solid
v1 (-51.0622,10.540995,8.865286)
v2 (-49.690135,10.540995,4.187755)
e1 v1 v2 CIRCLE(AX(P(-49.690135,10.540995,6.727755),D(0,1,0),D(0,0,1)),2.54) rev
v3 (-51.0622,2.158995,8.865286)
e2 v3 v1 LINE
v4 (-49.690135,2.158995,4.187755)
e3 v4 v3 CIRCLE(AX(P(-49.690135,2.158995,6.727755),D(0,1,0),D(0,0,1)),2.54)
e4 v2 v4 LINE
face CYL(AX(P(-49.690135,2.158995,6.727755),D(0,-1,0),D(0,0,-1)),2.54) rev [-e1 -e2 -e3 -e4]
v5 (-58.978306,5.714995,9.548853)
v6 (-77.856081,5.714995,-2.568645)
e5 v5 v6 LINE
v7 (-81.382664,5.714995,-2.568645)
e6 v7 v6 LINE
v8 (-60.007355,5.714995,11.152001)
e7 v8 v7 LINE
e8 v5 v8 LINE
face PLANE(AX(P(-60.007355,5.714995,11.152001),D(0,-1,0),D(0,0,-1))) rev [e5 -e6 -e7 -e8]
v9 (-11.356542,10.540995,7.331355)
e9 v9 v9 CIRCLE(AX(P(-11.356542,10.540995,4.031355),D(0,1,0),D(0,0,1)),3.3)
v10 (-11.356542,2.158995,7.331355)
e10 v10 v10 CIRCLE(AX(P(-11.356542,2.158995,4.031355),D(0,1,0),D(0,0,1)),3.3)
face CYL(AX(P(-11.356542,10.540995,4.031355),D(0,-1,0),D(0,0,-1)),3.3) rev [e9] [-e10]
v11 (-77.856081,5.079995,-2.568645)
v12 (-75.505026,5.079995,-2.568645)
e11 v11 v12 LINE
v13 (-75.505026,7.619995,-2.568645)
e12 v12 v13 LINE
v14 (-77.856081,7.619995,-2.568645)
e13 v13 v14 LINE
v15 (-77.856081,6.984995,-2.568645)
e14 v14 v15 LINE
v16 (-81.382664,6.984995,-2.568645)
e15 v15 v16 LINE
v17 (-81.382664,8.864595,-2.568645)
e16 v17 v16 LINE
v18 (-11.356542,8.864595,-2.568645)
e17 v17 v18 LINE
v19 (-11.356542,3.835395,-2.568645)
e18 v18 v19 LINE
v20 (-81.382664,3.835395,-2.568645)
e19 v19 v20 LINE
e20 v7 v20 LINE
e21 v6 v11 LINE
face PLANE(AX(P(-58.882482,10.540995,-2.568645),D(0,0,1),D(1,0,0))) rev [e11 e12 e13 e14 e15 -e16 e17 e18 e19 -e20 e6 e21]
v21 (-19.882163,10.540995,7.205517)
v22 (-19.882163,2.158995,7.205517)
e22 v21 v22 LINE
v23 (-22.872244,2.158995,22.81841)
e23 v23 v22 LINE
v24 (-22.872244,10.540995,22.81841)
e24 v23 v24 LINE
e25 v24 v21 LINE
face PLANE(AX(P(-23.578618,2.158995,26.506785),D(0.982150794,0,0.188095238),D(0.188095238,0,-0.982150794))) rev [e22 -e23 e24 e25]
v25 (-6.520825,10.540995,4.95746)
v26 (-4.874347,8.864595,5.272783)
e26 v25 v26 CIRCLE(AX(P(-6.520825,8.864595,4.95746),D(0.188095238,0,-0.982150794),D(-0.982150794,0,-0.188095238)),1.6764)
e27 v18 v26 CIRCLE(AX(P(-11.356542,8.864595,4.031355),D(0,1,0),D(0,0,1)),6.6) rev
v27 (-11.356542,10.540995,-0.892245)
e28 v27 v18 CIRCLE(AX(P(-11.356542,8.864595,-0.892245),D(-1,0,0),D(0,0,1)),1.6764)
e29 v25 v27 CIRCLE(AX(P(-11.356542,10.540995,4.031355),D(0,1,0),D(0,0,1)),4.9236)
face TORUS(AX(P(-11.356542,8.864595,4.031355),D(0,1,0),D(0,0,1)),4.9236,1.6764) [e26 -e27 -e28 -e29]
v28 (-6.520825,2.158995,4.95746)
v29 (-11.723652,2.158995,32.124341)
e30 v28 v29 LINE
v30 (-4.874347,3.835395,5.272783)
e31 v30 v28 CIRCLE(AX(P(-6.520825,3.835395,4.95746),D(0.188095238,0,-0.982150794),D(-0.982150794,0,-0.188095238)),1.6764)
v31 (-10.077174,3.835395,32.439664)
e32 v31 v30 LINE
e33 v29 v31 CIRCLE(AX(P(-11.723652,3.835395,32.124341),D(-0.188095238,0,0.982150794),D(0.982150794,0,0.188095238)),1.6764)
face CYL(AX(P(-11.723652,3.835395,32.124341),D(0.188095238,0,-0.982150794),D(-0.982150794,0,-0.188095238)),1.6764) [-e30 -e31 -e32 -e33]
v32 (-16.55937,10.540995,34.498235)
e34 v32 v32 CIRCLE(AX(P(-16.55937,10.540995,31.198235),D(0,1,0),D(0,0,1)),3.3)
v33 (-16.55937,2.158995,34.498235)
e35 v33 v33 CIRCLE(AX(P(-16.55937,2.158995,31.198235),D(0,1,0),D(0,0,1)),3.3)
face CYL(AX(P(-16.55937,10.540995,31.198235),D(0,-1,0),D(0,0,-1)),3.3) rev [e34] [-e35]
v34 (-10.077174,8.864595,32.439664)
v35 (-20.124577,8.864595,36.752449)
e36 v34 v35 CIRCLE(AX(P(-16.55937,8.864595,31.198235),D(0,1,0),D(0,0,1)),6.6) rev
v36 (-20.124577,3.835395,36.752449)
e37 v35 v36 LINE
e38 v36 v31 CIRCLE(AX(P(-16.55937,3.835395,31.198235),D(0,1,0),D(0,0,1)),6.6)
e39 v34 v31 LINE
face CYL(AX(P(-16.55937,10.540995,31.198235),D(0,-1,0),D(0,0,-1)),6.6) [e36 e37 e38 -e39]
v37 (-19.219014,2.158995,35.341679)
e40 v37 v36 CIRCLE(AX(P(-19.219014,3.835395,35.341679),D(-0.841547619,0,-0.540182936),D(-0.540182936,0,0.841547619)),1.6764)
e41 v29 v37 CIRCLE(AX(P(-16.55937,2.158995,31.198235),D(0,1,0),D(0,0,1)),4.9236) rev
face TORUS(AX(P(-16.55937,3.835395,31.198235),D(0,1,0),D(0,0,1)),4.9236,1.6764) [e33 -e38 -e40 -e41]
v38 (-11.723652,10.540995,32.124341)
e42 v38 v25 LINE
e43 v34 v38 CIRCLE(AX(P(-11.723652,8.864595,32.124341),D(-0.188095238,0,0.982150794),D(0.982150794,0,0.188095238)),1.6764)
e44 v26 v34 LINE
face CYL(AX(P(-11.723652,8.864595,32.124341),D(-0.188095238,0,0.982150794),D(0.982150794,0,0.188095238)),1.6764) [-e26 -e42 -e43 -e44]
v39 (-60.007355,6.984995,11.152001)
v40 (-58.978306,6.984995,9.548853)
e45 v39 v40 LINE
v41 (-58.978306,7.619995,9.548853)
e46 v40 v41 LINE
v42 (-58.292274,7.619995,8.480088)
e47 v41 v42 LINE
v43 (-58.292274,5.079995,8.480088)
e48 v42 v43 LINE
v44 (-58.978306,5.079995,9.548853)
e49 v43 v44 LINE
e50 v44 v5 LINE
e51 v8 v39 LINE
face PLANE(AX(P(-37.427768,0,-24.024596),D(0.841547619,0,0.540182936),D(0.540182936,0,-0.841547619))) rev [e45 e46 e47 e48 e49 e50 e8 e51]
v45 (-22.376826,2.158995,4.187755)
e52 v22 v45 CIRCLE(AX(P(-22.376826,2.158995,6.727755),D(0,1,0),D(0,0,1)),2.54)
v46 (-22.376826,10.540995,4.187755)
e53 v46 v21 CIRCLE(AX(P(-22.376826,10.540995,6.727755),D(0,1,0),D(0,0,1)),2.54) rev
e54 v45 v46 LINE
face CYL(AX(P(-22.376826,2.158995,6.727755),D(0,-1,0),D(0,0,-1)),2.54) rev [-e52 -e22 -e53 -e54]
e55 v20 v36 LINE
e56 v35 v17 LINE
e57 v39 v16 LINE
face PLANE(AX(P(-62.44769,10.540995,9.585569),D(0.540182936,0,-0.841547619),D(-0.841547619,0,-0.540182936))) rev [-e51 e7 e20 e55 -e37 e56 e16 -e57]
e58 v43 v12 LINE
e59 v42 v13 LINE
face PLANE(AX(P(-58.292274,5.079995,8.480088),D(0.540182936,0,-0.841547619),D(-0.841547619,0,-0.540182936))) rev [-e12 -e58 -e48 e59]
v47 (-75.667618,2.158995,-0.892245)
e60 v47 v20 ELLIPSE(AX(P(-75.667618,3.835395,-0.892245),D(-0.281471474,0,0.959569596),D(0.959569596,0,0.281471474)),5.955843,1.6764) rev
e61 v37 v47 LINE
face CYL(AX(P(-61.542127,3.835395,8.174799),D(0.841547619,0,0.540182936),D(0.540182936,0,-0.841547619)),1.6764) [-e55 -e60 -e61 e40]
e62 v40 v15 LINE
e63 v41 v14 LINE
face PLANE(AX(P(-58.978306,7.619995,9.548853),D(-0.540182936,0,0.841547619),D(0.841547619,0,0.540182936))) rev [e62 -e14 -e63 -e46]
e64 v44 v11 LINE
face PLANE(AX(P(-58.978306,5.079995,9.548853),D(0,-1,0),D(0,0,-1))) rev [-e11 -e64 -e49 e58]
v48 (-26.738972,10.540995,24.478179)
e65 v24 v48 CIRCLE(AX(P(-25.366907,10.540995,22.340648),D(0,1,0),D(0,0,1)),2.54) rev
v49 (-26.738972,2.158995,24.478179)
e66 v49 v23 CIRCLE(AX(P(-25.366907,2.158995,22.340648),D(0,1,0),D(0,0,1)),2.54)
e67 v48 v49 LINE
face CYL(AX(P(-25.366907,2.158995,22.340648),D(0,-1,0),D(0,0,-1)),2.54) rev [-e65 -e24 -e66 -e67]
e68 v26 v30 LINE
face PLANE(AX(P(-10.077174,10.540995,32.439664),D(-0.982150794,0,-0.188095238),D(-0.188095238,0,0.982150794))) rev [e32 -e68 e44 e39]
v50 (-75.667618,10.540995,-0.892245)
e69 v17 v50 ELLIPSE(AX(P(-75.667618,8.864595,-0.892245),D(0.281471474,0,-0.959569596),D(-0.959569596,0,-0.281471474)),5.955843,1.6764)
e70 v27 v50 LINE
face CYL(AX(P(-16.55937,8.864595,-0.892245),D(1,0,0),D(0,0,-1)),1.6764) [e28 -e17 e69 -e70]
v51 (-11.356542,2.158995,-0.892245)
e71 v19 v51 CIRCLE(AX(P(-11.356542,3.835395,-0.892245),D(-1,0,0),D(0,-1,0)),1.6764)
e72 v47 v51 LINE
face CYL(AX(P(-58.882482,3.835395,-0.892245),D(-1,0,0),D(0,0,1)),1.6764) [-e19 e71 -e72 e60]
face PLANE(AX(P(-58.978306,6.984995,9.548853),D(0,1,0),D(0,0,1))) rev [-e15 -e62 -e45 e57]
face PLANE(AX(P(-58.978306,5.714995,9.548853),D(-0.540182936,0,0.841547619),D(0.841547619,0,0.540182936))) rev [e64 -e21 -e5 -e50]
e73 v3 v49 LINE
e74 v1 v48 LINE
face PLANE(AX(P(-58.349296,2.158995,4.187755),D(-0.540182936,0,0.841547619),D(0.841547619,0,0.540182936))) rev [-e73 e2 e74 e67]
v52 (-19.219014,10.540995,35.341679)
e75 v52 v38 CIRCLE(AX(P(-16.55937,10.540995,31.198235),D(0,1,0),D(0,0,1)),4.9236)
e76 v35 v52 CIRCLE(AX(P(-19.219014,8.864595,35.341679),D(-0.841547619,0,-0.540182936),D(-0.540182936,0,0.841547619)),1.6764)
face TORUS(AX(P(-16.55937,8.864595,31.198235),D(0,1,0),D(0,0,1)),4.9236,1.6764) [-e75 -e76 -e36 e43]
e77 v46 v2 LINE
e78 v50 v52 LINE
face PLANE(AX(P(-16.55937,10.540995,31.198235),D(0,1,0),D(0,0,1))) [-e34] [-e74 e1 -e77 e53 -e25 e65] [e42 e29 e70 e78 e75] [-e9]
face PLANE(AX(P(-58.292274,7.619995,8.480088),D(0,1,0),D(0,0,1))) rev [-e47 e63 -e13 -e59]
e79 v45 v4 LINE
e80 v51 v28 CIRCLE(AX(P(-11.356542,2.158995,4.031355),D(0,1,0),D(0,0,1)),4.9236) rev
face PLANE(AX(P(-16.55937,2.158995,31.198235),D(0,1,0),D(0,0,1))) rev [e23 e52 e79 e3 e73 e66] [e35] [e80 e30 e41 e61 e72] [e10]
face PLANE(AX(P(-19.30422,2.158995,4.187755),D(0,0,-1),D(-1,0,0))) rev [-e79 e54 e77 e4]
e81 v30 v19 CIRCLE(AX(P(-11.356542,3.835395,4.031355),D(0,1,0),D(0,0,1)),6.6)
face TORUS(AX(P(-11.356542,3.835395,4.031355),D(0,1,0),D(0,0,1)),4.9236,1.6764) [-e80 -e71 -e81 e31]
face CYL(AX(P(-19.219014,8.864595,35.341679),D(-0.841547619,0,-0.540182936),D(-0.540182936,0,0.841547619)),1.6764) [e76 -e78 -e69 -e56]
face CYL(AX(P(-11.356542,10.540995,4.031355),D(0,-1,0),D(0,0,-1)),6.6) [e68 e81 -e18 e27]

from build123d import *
from OCP.BRepAlgoAPI import BRepAlgoAPI_Cut
from OCP.TopTools import TopTools_ListOfShape

# Parameters (mm, degrees)
SKETCH1_R           = 5
BOSS_EXTRUDE1_DEPTH = 12.7
FILLET1_R           = 2.54
SCALE1_SCALE        = 0.66
CUT_EXTRUDE1_DEPTH  = 91.122674363
FILLET2_R           = 2.54
CUT_EXTRUDE2_DEPTH  = 25.4


with BuildPart() as part:
    # Sketch1 → Boss-Extrude1 (new body)
    with BuildSketch(Plane(origin=(0, 0, 0), x_dir=(1, 0, 0), z_dir=(0, 1, 0))):
        with BuildLine():
            Line((-77.410829365, -8.41547619), (-13.284900793, -49.577415951))
            ThreePointArc((-13.284900793, -49.577415951), (-3.938658922, -50.351151369), (1.938436508, -43.042892142))
            Line((1.938436508, -43.042892142), (9.821507936, -1.880952381))
            ThreePointArc((9.821507936, -1.880952381), (7.707448469, 6.371439248), (0, 10))
            Line((0, 10), (-72.009, 10))
            Line((-72.009, 10), (-106.100184572, 10))
            Line((-106.100184572, 10), (-77.410829365, -8.41547619))
        make_face()
        Circle(SKETCH1_R, mode=Mode.SUBTRACT)
        with Locations((-7.883071429, -41.161939761)):
            Circle(SKETCH1_R, mode=Mode.SUBTRACT)
    extrude(amount=BOSS_EXTRUDE1_DEPTH)

    # Fillet1
    fillet1_edges = [part.edges().sort_by_distance(p)[0] for p in [
        (-53.050092286, 0, -10),
        (7.707448469, 0, -6.371439248),
        (5.879972222, 0, 22.461922261),
        (-3.938658922, 0, 50.351151369),
        (-53.050092286, 12.7, -10),
        (7.707448469, 12.7, -6.371439248),
        (5.879972222, 12.7, 22.461922261),
        (-3.938658922, 12.7, 50.351151369),
        (-59.692542683, 0, 19.788707976),
        (-59.692542683, 12.7, 19.788707976),
    ]]
    fillet(fillet1_edges, radius=FILLET1_R)


with BuildPart() as part_1:
    # Scale1: scaled about (-33.401454618, 6.35, 11.856994793)
    add(part.part.scale(SCALE1_SCALE).moved(Location((-11.35649457, 2.159, 4.03137823))))


with BuildPart() as cut_extrude1_tool:
    # Sketch2 → Cut-Extrude1 (new, through all)
    with BuildSketch(Plane(origin=(0, 10.540994585, 0), x_dir=(1, 0, 0), z_dir=(0, 1, 0))):
        Polygon((-58.349296315, -4.187754758), (-23.578618247, -26.506785264), (-19.304220279, -4.187754758), align=None)
    extrude(amount=-CUT_EXTRUDE1_DEPTH)


with BuildPart() as part_2:
    add(part_1.part)

    # Cut-Extrude1: cut by cut_extrude1_tool, with a tolerance
    cut_extrude1_stock = TopTools_ListOfShape()
    cut_extrude1_stock.Append(part_2.part.wrapped)
    cut_extrude1_tools = TopTools_ListOfShape()
    cut_extrude1_tools.Append(cut_extrude1_tool.part.wrapped)
    cut_extrude1_cut = BRepAlgoAPI_Cut()
    cut_extrude1_cut.SetArguments(cut_extrude1_stock)
    cut_extrude1_cut.SetTools(cut_extrude1_tools)
    cut_extrude1_cut.SetFuzzyValue(0.00001)
    cut_extrude1_cut.Build()
    add(Compound.cast(cut_extrude1_cut.Shape()).solids(), mode=Mode.REPLACE)

    # Fillet2
    fillet2_edges = [part_2.edges().sort_by_distance(p)[0] for p in [
        (-23.578618247, 6.349997293, 26.506785264),
        (-19.304220279, 6.349997293, 4.187754758),
        (-58.349296315, 6.349997293, 4.187754758),
    ]]
    fillet(fillet2_edges, radius=FILLET2_R)

    # Sketch3 → Cut-Extrude2 (cut)
    with BuildSketch(Plane(origin=(-58.803077328, 0, -37.745242535), x_dir=(0, -1, 0), z_dir=(-0.841547619047619, 0, -0.5401829364902999))):
        Polygon((-5.714994585, 41.799889271), (-5.714994585, 39.894889271), (-5.079994585, 39.894889271), (-5.079994585, 38.624889271), (-7.619994585, 38.624889271), (-7.619994585, 39.894889271), (-6.984994585, 39.894889271), (-6.984994585, 41.799889271), align=None)
    extrude(amount=-CUT_EXTRUDE2_DEPTH, mode=Mode.SUBTRACT)


solid = part_2.part
